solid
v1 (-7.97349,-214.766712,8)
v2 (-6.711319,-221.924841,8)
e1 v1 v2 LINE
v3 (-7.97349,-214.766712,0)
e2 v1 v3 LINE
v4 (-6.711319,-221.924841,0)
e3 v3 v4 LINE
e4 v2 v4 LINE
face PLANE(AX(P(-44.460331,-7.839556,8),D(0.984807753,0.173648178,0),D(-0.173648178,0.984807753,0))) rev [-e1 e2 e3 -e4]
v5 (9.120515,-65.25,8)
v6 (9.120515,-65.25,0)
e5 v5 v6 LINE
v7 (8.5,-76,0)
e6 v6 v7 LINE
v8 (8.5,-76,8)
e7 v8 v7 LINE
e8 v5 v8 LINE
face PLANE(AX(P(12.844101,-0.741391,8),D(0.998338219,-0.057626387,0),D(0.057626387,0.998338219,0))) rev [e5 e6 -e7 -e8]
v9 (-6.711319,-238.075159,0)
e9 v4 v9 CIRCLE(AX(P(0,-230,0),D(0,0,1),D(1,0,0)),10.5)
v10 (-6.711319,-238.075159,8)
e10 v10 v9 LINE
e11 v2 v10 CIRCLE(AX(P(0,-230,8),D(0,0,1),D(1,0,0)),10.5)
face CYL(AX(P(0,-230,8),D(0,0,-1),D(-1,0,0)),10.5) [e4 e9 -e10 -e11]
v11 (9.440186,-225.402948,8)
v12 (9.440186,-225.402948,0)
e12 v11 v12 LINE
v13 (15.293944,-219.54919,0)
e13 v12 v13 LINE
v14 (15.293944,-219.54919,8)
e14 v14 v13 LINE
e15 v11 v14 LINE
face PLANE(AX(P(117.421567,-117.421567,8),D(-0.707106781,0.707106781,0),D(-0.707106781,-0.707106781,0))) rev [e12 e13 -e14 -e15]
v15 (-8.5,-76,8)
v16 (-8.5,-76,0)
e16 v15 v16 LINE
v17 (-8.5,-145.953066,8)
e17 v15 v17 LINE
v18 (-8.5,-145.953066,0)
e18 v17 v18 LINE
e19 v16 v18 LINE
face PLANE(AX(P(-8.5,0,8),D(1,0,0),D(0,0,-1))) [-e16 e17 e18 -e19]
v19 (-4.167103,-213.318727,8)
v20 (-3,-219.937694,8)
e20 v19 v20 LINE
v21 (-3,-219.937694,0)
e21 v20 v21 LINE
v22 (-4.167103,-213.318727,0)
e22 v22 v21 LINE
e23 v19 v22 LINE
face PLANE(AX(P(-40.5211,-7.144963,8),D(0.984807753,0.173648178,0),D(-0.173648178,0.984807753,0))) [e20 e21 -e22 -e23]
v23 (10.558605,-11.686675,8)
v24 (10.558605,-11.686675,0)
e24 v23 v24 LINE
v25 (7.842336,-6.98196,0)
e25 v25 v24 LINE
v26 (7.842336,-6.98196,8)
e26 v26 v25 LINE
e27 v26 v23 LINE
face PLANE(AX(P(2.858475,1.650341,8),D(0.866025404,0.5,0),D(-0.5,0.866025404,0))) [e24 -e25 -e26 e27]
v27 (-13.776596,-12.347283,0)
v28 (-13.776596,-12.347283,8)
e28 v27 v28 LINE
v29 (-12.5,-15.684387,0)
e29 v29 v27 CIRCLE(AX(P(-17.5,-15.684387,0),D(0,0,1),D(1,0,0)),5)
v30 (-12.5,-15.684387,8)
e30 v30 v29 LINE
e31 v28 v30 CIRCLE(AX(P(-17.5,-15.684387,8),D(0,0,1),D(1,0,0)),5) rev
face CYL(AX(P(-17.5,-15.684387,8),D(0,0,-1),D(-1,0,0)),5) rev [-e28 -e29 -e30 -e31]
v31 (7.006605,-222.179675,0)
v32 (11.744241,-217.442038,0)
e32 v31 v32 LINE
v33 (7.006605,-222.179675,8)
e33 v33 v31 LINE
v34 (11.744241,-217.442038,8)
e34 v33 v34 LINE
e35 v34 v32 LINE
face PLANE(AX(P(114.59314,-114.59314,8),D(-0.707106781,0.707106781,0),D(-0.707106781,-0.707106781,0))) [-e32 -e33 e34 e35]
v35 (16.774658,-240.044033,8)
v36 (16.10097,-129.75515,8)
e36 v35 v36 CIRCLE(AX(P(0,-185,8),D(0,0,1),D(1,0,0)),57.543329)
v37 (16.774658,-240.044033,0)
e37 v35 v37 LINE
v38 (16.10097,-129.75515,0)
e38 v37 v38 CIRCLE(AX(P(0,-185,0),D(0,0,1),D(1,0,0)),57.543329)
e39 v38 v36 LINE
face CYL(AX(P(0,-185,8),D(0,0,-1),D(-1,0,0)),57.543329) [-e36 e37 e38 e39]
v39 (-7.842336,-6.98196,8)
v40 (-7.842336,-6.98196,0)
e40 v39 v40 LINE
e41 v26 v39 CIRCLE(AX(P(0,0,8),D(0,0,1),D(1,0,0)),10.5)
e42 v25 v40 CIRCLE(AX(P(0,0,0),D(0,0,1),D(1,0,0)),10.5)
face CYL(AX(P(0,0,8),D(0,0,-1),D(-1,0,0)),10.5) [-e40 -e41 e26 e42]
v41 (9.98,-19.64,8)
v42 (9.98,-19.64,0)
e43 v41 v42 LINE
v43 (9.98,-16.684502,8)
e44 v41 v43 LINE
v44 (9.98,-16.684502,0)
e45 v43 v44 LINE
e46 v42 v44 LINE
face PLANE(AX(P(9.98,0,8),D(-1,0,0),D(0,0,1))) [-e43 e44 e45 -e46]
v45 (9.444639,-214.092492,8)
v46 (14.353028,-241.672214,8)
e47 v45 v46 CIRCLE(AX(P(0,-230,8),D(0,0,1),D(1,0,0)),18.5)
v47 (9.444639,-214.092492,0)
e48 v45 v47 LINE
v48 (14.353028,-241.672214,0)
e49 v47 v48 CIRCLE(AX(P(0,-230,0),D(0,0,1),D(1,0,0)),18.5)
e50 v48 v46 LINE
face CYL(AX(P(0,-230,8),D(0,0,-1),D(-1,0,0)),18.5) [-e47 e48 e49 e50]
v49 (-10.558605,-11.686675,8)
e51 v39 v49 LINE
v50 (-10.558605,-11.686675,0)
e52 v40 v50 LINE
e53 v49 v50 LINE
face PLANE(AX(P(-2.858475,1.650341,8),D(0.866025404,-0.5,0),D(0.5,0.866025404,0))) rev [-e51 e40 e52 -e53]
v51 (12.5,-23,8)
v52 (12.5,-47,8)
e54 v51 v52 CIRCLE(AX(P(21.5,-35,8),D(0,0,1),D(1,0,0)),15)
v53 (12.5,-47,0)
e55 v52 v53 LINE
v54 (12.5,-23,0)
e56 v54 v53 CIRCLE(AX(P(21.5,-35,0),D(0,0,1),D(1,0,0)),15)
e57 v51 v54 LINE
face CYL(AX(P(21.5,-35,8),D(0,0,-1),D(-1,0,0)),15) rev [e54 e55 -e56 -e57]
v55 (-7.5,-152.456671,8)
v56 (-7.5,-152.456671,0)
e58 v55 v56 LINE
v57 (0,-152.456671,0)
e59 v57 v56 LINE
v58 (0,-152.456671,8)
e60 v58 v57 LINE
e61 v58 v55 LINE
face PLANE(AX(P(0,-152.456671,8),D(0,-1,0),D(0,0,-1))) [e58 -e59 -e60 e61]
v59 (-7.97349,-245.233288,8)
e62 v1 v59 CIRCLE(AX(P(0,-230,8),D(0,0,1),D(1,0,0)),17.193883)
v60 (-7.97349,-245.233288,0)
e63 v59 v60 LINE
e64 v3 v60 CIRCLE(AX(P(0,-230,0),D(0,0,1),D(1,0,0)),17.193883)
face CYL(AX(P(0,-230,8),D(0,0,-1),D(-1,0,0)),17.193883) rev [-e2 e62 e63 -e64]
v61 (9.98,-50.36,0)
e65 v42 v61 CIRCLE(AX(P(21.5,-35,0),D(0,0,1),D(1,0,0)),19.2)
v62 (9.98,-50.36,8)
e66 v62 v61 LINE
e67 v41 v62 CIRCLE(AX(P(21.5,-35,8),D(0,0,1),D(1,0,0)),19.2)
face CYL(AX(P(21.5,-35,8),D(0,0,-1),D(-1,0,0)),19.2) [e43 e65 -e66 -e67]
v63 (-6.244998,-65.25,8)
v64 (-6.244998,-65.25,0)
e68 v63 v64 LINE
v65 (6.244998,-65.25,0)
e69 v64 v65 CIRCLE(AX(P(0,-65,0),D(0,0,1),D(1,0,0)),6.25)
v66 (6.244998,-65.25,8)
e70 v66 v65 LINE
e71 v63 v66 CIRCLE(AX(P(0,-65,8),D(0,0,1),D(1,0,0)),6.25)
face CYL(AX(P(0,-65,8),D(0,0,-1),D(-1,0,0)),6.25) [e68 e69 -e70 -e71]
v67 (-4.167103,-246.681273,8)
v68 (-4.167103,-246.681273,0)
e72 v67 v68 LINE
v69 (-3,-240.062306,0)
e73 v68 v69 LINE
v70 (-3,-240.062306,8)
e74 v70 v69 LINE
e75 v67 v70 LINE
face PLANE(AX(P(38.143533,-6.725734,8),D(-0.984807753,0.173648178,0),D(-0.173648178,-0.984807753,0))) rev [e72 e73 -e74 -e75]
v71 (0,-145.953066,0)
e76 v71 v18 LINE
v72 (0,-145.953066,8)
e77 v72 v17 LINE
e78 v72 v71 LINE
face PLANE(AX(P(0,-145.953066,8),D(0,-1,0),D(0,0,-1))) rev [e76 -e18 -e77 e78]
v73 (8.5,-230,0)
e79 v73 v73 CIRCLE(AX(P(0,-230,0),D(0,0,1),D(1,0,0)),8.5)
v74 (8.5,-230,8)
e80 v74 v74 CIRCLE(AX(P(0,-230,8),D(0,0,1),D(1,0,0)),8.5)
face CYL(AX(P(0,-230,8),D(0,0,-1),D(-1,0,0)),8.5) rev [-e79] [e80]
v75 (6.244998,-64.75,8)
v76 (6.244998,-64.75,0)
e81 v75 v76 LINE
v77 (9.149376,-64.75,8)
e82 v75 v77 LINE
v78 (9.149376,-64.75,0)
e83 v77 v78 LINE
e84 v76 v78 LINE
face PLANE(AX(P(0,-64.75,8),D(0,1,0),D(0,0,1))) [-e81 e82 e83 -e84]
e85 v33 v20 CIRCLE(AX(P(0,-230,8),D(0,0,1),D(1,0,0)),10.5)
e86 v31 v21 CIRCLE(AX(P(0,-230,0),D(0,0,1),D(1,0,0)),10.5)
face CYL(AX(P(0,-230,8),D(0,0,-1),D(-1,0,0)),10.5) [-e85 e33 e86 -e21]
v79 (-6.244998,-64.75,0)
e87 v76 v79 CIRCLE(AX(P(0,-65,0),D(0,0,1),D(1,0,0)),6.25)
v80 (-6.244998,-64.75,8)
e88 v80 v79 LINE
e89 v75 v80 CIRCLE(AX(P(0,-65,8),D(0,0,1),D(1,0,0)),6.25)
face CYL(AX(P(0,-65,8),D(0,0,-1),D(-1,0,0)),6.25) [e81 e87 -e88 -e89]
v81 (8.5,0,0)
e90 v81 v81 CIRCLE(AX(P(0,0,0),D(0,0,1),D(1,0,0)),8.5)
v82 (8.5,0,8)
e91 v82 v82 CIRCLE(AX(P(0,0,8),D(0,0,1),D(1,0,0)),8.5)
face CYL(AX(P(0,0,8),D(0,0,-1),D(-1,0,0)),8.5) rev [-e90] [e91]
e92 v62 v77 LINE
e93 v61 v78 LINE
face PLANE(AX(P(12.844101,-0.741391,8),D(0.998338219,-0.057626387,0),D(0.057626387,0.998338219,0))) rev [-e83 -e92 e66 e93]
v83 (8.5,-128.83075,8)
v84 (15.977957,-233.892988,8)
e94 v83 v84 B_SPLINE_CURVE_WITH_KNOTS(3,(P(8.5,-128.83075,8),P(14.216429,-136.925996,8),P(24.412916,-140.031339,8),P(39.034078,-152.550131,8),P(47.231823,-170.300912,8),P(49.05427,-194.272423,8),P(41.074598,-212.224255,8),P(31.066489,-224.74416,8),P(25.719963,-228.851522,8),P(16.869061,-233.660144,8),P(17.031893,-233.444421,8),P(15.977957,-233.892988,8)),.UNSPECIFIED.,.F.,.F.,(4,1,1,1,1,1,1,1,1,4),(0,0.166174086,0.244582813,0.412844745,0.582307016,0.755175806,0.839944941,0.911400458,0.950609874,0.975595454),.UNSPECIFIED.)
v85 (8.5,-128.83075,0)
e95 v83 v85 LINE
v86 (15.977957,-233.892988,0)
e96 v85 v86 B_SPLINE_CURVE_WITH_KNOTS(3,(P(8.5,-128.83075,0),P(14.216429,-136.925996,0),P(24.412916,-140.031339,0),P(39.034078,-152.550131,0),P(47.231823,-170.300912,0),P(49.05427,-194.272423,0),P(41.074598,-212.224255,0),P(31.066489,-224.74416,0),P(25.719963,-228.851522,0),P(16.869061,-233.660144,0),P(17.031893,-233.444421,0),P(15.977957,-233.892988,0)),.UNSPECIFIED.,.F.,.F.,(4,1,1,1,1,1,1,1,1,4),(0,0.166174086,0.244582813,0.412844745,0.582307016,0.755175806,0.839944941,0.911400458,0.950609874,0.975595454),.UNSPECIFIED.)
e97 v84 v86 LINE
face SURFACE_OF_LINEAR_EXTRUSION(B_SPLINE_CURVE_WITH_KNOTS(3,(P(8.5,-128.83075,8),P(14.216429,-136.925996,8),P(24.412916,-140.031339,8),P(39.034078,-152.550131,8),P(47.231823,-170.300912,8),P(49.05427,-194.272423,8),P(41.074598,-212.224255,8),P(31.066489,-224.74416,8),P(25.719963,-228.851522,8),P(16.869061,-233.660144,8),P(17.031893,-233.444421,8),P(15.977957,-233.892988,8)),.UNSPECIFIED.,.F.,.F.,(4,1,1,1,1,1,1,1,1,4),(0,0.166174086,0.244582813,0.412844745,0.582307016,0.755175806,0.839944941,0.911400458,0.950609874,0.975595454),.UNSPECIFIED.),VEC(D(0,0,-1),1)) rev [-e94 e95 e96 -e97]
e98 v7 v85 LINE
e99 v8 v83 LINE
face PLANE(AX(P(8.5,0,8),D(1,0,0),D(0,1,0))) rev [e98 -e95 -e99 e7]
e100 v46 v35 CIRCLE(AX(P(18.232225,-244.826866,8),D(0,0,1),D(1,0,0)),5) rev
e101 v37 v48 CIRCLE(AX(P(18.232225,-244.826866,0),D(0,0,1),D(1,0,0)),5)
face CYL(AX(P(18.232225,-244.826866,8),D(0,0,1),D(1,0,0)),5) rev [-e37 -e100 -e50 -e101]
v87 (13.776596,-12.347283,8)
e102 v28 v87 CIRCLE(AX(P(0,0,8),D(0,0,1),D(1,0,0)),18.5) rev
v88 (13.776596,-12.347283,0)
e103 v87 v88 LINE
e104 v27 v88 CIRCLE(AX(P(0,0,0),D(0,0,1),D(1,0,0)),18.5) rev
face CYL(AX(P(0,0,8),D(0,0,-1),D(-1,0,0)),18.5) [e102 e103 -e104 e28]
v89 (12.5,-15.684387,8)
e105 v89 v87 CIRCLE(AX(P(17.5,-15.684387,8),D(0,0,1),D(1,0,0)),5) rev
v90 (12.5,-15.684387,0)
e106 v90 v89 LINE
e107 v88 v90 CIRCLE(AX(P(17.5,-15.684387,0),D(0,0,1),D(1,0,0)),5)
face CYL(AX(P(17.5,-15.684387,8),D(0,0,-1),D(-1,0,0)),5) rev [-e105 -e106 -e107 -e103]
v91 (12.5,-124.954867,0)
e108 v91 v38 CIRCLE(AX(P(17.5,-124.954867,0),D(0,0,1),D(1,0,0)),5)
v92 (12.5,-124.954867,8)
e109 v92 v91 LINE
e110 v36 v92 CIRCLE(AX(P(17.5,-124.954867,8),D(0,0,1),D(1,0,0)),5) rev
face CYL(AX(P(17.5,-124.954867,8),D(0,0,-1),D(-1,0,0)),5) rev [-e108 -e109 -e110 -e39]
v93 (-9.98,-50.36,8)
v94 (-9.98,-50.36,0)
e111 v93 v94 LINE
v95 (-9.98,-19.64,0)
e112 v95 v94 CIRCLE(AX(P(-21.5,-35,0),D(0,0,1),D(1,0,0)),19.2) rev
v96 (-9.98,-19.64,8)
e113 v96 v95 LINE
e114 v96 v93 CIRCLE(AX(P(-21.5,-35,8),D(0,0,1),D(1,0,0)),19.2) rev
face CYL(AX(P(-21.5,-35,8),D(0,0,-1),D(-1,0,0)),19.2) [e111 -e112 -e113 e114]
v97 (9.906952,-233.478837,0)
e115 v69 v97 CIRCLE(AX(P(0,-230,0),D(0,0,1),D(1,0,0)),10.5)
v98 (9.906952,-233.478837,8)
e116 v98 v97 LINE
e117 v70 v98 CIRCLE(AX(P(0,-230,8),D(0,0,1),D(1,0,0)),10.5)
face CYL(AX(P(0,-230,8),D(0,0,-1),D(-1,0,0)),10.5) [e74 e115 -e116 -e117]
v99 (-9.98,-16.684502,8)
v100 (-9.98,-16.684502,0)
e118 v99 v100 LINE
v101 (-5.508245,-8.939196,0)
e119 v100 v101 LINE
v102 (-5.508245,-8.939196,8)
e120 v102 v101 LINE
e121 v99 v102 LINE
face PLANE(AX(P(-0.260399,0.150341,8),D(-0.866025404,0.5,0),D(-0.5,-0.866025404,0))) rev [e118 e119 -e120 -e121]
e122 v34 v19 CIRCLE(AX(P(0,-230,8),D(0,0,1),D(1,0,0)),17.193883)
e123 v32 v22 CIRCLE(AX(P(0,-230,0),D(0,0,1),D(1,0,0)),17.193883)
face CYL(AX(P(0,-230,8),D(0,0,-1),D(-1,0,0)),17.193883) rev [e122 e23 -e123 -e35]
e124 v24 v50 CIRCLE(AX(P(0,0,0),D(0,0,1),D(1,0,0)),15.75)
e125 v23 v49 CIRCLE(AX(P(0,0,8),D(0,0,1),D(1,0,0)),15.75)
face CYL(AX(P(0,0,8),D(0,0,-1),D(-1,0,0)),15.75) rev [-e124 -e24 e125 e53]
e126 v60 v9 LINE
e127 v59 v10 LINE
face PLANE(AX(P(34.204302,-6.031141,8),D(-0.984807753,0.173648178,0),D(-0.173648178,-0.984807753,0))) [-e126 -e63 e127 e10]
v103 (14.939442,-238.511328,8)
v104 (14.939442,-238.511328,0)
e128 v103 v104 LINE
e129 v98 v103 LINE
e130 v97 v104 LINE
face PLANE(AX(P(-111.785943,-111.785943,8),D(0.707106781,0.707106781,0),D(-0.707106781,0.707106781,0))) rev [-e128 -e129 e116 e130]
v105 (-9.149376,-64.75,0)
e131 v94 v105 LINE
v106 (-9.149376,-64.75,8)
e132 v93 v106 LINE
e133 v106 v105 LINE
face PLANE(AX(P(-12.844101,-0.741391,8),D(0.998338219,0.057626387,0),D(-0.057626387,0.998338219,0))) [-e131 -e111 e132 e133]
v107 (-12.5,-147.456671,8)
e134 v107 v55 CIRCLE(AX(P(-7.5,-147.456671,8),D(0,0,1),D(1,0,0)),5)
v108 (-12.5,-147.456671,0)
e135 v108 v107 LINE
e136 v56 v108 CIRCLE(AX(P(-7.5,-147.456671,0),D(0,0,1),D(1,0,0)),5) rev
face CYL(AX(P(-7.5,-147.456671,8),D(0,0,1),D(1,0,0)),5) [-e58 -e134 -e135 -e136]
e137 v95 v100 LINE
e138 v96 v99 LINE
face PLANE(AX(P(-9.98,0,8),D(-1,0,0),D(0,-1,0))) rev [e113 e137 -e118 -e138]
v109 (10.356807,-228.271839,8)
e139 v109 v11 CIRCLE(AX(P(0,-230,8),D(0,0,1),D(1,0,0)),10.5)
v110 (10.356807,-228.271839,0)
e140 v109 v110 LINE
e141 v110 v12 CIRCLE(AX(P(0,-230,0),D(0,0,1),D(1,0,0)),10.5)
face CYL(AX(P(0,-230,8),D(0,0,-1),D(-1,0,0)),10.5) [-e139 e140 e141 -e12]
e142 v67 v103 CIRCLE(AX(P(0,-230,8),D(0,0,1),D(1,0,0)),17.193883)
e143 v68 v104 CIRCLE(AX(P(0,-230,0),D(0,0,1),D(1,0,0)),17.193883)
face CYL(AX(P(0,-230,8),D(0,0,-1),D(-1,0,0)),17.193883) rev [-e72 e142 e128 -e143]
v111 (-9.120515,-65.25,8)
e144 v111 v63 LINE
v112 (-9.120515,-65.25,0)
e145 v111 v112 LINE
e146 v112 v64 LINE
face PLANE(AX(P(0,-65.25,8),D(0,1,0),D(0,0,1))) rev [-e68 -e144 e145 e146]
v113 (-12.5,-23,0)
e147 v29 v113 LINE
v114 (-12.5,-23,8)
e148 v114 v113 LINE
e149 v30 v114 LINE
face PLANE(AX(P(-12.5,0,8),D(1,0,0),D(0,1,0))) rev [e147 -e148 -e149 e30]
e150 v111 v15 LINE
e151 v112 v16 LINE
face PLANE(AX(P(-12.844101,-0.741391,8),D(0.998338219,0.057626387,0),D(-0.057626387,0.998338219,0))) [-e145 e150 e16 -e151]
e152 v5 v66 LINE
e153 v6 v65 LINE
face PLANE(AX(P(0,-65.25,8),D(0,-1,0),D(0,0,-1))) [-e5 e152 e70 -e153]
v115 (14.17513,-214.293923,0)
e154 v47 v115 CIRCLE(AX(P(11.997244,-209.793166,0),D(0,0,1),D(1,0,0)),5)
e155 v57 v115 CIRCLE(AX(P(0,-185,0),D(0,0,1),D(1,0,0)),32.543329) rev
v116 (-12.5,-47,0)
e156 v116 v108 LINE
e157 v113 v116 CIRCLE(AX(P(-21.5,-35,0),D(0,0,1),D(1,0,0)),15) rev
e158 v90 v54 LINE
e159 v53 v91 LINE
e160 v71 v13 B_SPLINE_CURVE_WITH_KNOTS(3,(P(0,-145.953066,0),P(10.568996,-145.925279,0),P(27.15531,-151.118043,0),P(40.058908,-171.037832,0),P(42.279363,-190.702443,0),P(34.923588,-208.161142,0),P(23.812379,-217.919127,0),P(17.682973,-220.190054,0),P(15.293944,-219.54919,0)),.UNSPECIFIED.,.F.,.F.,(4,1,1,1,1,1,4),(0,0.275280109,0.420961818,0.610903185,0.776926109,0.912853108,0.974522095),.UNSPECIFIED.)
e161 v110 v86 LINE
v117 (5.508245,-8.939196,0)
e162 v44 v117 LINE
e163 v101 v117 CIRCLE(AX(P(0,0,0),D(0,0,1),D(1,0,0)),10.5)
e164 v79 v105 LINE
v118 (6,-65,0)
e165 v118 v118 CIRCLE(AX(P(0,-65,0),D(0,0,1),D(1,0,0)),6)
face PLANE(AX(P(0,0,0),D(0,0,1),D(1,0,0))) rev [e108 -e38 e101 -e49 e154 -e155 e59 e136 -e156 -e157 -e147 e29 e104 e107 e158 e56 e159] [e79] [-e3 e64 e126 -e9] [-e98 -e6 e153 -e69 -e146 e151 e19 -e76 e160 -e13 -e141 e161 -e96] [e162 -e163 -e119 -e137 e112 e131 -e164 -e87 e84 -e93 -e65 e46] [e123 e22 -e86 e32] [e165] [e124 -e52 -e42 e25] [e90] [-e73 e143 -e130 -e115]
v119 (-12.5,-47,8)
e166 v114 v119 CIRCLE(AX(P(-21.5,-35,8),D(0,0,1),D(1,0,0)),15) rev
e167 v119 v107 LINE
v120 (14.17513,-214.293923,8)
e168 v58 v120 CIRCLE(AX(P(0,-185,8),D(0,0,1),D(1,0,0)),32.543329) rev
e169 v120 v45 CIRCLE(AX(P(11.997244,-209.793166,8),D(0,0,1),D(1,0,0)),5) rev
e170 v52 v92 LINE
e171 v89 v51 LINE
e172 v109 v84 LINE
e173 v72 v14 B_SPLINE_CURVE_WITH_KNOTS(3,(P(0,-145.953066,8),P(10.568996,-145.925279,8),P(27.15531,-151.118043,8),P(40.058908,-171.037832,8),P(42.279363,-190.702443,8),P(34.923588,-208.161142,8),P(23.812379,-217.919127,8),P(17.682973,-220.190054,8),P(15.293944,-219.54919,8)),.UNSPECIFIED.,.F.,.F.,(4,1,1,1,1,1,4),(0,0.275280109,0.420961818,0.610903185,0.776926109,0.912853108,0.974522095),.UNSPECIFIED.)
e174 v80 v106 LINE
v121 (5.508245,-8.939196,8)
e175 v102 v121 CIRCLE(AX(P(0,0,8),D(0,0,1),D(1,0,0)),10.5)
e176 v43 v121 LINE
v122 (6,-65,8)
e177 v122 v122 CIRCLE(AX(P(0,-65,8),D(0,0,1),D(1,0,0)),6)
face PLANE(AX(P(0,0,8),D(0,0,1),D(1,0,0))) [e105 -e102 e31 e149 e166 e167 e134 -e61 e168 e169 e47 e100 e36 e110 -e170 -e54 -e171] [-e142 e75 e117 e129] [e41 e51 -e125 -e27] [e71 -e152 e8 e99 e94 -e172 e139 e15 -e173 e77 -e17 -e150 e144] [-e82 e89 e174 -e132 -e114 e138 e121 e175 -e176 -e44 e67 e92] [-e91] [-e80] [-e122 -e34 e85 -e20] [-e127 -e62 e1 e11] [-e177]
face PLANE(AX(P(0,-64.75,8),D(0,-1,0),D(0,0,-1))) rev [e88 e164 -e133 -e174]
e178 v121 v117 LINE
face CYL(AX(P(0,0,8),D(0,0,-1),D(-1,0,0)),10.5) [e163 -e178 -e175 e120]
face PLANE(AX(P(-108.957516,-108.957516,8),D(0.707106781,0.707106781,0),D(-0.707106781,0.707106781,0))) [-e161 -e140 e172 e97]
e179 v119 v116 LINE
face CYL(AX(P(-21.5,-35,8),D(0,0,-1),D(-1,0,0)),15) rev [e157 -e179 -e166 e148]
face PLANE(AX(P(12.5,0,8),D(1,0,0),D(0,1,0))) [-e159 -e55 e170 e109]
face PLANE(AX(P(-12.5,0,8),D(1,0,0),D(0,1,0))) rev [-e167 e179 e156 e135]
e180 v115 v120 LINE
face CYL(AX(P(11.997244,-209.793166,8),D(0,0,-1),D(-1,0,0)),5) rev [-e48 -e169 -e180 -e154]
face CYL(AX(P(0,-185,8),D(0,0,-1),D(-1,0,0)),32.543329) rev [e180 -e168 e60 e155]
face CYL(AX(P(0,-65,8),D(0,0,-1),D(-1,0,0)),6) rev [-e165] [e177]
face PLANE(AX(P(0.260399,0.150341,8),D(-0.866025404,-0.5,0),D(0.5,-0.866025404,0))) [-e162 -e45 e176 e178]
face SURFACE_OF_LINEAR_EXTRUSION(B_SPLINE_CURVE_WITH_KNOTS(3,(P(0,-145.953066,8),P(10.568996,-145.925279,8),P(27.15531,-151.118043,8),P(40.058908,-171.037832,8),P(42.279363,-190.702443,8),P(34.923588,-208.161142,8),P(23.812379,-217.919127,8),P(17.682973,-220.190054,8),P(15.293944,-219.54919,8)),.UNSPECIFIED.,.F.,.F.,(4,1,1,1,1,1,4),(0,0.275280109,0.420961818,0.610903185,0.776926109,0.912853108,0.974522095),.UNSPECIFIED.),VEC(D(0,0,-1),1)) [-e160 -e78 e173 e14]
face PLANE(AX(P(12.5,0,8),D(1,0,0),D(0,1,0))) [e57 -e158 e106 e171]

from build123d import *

# Parameters (mm, degrees)
BOSS_EXTRUDE1_OUTLINE_R   = 8.5
BOSS_EXTRUDE1_OUTLINE_R_2 = 6
BOSS_EXTRUDE1_DEPTH       = 8
FILLET1_R                 = 5


# Read off the part's stored shape, not the designer's step: Boss-Extrude1
with BuildPart() as part:
    # Boss-Extrude1 outline → Boss-Extrude1 (new body)
    with BuildSketch(Plane.XY):
        with BuildLine():
            ThreePointArc((11.444366088, -215.464647068), (-18.29086587, -232.773846738), (15.239317045, -240.488718511))
            ThreePointArc((15.239317045, -240.488718511), (57.52601951, -183.58870793), (12.5, -128.830749818))
            Line((12.5, -128.830749818), (12.5, -47))
            ThreePointArc((12.5, -47), (6.5, -35), (12.5, -23))
            Line((12.5, -23), (12.5, -13.638181697))
            ThreePointArc((12.5, -13.638181697), (0, 18.5), (-12.5, -13.638181697))
            Line((-12.5, -13.638181697), (-12.5, -23))
            ThreePointArc((-12.5, -23), (-6.5, -35), (-12.5, -47))
            Line((-12.5, -47), (-12.5, -152.456671403))
            Line((-12.5, -152.456671403), (0, -152.456671403))
            ThreePointArc((0, -152.456671403), (32.019441409, -179.184193262), (11.444366088, -215.464647068))
        make_face()
        with BuildLine():
            Line((-7.973490155, -214.766711736), (-6.711318898, -221.924840642))
            ThreePointArc((-6.711318898, -221.924840642), (-10.5, -230), (-6.711318898, -238.075159358))
            Line((-6.711318898, -238.075159358), (-7.973490155, -245.233288264))
            ThreePointArc((-7.973490155, -245.233288264), (-17.193883115, -230), (-7.973490155, -214.766711736))
        make_face(mode=Mode.SUBTRACT)
        with Locations((0, -230)):
            Circle(BOSS_EXTRUDE1_OUTLINE_R, mode=Mode.SUBTRACT)
        with BuildLine():
            Line((9.906951591, -233.478837475), (14.939441722, -238.511327606))
            ThreePointArc((14.939441722, -238.511327606), (6.76001668, -245.809231198), (-4.167102507, -246.681273131))
            Line((-4.167102507, -246.681273131), (-3, -240.062305899))
            ThreePointArc((-3, -240.062305899), (4.770954746, -239.353501527), (9.906951591, -233.478837475))
        make_face(mode=Mode.SUBTRACT)
        with BuildLine():
            ThreePointArc((-4.167102507, -213.318726869), (4.313198594, -213.355903915), (11.744241411, -217.442037973))
            Line((11.744241411, -217.442037973), (7.006604785, -222.179674599))
            ThreePointArc((7.006604785, -222.179674599), (2.295613124, -219.754017354), (-3, -219.937694101))
            Line((-3, -219.937694101), (-4.167102507, -213.318726869))
        make_face(mode=Mode.SUBTRACT)
        with BuildLine():
            Line((-9.120514821, -65.25), (-6.244997998, -65.25))
            ThreePointArc((-6.244997998, -65.25), (0, -71.25), (6.244997998, -65.25))
            Line((6.244997998, -65.25), (9.120514821, -65.25))
            Line((9.120514821, -65.25), (8.5, -76))
            Line((8.5, -76), (8.5, -128.830749818))
            add(Edge.make_bspline(
                [(8.5, -128.830749818), (14.216428999, -136.925995784), (24.412916063, -140.031339282), (39.034077584, -152.550131118), (47.231822633, -170.300911516), (49.054269576, -194.272422538), (41.074598095, -212.224255349), (31.066489276, -224.744159717), (25.719963337, -228.85152204), (16.869060862, -233.660143999), (17.031893097, -233.444420703), (15.977956611, -233.892988246)],
                knots=[0, 0, 0, 0, 0.166174086, 0.244582813, 0.412844745, 0.582307016, 0.755175806, 0.839944941, 0.911400458, 0.950609874, 0.975595454, 0.975595454, 0.975595454, 0.975595454], degree=3))
            Line((15.977956611, -233.892988246), (10.356807409, -228.271839044))
            ThreePointArc((10.356807409, -228.271839044), (10.001893352, -226.804357751), (9.440185923, -225.402947711))
            Line((9.440185923, -225.402947711), (15.293943971, -219.549189663))
            add(Edge.make_bspline(
                [(0, -145.95306611), (10.568996212, -145.925278871), (27.155310415, -151.118043437), (40.058908168, -171.037832184), (42.279362691, -190.702442643), (34.923587781, -208.161141567), (23.812379339, -217.919127216), (17.682972603, -220.190054159), (15.293943971, -219.549189663)],
                knots=[0, 0, 0, 0, 0.275280109, 0.420961818, 0.610903185, 0.776926109, 0.912853108, 0.974522095, 0.974522095, 0.974522095, 0.974522095], degree=3))
            Line((0, -145.95306611), (-8.5, -145.95306611))
            Line((-8.5, -145.95306611), (-8.5, -76))
            Line((-8.5, -76), (-9.120514821, -65.25))
        make_face(mode=Mode.SUBTRACT)
        with Locations((0, -65)):
            Circle(BOSS_EXTRUDE1_OUTLINE_R_2, mode=Mode.SUBTRACT)
        with BuildLine():
            Line((-9.98, -16.684502452), (-5.508245457, -8.939196384))
            ThreePointArc((-5.508245457, -8.939196384), (0, -10.5), (5.508245457, -8.939196384))
            Line((5.508245457, -8.939196384), (9.98, -16.684502452))
            Line((9.98, -16.684502452), (9.98, -19.64))
            ThreePointArc((9.98, -19.64), (2.3, -35), (9.98, -50.36))
            Line((9.98, -50.36), (9.149375975, -64.75))
            Line((9.149375975, -64.75), (6.244997998, -64.75))
            ThreePointArc((6.244997998, -64.75), (0, -58.75), (-6.244997998, -64.75))
            Line((-6.244997998, -64.75), (-9.149375975, -64.75))
            Line((-9.149375975, -64.75), (-9.98, -50.36))
            ThreePointArc((-9.98, -50.36), (-2.3, -35), (-9.98, -19.64))
            Line((-9.98, -19.64), (-9.98, -16.684502452))
        make_face(mode=Mode.SUBTRACT)
        Circle(BOSS_EXTRUDE1_OUTLINE_R, mode=Mode.SUBTRACT)
        with BuildLine():
            ThreePointArc((7.842336088, -6.981959946), (0, 10.5), (-7.842336088, -6.981959946))
            Line((-7.842336088, -6.981959946), (-10.558604534, -11.686674903))
            ThreePointArc((-10.558604534, -11.686674903), (0, 15.75), (10.558604534, -11.686674903))
            Line((10.558604534, -11.686674903), (7.842336088, -6.981959946))
        make_face(mode=Mode.SUBTRACT)
    extrude(amount=BOSS_EXTRUDE1_DEPTH)

    # Fillet1
    fillet1_edges = [part.edges().sort_by_distance(p)[0] for p in [
        (11.444366088, -215.464647068, 4),
        (-12.5, -152.456671403, 4),
        (-12.5, -13.638181697, 4),
        (12.5, -13.638181697, 4),
        (12.5, -128.830749818, 4),
        (15.239317045, -240.488718511, 4),
    ]]
    fillet(fillet1_edges, radius=FILLET1_R)


solid = part.part
